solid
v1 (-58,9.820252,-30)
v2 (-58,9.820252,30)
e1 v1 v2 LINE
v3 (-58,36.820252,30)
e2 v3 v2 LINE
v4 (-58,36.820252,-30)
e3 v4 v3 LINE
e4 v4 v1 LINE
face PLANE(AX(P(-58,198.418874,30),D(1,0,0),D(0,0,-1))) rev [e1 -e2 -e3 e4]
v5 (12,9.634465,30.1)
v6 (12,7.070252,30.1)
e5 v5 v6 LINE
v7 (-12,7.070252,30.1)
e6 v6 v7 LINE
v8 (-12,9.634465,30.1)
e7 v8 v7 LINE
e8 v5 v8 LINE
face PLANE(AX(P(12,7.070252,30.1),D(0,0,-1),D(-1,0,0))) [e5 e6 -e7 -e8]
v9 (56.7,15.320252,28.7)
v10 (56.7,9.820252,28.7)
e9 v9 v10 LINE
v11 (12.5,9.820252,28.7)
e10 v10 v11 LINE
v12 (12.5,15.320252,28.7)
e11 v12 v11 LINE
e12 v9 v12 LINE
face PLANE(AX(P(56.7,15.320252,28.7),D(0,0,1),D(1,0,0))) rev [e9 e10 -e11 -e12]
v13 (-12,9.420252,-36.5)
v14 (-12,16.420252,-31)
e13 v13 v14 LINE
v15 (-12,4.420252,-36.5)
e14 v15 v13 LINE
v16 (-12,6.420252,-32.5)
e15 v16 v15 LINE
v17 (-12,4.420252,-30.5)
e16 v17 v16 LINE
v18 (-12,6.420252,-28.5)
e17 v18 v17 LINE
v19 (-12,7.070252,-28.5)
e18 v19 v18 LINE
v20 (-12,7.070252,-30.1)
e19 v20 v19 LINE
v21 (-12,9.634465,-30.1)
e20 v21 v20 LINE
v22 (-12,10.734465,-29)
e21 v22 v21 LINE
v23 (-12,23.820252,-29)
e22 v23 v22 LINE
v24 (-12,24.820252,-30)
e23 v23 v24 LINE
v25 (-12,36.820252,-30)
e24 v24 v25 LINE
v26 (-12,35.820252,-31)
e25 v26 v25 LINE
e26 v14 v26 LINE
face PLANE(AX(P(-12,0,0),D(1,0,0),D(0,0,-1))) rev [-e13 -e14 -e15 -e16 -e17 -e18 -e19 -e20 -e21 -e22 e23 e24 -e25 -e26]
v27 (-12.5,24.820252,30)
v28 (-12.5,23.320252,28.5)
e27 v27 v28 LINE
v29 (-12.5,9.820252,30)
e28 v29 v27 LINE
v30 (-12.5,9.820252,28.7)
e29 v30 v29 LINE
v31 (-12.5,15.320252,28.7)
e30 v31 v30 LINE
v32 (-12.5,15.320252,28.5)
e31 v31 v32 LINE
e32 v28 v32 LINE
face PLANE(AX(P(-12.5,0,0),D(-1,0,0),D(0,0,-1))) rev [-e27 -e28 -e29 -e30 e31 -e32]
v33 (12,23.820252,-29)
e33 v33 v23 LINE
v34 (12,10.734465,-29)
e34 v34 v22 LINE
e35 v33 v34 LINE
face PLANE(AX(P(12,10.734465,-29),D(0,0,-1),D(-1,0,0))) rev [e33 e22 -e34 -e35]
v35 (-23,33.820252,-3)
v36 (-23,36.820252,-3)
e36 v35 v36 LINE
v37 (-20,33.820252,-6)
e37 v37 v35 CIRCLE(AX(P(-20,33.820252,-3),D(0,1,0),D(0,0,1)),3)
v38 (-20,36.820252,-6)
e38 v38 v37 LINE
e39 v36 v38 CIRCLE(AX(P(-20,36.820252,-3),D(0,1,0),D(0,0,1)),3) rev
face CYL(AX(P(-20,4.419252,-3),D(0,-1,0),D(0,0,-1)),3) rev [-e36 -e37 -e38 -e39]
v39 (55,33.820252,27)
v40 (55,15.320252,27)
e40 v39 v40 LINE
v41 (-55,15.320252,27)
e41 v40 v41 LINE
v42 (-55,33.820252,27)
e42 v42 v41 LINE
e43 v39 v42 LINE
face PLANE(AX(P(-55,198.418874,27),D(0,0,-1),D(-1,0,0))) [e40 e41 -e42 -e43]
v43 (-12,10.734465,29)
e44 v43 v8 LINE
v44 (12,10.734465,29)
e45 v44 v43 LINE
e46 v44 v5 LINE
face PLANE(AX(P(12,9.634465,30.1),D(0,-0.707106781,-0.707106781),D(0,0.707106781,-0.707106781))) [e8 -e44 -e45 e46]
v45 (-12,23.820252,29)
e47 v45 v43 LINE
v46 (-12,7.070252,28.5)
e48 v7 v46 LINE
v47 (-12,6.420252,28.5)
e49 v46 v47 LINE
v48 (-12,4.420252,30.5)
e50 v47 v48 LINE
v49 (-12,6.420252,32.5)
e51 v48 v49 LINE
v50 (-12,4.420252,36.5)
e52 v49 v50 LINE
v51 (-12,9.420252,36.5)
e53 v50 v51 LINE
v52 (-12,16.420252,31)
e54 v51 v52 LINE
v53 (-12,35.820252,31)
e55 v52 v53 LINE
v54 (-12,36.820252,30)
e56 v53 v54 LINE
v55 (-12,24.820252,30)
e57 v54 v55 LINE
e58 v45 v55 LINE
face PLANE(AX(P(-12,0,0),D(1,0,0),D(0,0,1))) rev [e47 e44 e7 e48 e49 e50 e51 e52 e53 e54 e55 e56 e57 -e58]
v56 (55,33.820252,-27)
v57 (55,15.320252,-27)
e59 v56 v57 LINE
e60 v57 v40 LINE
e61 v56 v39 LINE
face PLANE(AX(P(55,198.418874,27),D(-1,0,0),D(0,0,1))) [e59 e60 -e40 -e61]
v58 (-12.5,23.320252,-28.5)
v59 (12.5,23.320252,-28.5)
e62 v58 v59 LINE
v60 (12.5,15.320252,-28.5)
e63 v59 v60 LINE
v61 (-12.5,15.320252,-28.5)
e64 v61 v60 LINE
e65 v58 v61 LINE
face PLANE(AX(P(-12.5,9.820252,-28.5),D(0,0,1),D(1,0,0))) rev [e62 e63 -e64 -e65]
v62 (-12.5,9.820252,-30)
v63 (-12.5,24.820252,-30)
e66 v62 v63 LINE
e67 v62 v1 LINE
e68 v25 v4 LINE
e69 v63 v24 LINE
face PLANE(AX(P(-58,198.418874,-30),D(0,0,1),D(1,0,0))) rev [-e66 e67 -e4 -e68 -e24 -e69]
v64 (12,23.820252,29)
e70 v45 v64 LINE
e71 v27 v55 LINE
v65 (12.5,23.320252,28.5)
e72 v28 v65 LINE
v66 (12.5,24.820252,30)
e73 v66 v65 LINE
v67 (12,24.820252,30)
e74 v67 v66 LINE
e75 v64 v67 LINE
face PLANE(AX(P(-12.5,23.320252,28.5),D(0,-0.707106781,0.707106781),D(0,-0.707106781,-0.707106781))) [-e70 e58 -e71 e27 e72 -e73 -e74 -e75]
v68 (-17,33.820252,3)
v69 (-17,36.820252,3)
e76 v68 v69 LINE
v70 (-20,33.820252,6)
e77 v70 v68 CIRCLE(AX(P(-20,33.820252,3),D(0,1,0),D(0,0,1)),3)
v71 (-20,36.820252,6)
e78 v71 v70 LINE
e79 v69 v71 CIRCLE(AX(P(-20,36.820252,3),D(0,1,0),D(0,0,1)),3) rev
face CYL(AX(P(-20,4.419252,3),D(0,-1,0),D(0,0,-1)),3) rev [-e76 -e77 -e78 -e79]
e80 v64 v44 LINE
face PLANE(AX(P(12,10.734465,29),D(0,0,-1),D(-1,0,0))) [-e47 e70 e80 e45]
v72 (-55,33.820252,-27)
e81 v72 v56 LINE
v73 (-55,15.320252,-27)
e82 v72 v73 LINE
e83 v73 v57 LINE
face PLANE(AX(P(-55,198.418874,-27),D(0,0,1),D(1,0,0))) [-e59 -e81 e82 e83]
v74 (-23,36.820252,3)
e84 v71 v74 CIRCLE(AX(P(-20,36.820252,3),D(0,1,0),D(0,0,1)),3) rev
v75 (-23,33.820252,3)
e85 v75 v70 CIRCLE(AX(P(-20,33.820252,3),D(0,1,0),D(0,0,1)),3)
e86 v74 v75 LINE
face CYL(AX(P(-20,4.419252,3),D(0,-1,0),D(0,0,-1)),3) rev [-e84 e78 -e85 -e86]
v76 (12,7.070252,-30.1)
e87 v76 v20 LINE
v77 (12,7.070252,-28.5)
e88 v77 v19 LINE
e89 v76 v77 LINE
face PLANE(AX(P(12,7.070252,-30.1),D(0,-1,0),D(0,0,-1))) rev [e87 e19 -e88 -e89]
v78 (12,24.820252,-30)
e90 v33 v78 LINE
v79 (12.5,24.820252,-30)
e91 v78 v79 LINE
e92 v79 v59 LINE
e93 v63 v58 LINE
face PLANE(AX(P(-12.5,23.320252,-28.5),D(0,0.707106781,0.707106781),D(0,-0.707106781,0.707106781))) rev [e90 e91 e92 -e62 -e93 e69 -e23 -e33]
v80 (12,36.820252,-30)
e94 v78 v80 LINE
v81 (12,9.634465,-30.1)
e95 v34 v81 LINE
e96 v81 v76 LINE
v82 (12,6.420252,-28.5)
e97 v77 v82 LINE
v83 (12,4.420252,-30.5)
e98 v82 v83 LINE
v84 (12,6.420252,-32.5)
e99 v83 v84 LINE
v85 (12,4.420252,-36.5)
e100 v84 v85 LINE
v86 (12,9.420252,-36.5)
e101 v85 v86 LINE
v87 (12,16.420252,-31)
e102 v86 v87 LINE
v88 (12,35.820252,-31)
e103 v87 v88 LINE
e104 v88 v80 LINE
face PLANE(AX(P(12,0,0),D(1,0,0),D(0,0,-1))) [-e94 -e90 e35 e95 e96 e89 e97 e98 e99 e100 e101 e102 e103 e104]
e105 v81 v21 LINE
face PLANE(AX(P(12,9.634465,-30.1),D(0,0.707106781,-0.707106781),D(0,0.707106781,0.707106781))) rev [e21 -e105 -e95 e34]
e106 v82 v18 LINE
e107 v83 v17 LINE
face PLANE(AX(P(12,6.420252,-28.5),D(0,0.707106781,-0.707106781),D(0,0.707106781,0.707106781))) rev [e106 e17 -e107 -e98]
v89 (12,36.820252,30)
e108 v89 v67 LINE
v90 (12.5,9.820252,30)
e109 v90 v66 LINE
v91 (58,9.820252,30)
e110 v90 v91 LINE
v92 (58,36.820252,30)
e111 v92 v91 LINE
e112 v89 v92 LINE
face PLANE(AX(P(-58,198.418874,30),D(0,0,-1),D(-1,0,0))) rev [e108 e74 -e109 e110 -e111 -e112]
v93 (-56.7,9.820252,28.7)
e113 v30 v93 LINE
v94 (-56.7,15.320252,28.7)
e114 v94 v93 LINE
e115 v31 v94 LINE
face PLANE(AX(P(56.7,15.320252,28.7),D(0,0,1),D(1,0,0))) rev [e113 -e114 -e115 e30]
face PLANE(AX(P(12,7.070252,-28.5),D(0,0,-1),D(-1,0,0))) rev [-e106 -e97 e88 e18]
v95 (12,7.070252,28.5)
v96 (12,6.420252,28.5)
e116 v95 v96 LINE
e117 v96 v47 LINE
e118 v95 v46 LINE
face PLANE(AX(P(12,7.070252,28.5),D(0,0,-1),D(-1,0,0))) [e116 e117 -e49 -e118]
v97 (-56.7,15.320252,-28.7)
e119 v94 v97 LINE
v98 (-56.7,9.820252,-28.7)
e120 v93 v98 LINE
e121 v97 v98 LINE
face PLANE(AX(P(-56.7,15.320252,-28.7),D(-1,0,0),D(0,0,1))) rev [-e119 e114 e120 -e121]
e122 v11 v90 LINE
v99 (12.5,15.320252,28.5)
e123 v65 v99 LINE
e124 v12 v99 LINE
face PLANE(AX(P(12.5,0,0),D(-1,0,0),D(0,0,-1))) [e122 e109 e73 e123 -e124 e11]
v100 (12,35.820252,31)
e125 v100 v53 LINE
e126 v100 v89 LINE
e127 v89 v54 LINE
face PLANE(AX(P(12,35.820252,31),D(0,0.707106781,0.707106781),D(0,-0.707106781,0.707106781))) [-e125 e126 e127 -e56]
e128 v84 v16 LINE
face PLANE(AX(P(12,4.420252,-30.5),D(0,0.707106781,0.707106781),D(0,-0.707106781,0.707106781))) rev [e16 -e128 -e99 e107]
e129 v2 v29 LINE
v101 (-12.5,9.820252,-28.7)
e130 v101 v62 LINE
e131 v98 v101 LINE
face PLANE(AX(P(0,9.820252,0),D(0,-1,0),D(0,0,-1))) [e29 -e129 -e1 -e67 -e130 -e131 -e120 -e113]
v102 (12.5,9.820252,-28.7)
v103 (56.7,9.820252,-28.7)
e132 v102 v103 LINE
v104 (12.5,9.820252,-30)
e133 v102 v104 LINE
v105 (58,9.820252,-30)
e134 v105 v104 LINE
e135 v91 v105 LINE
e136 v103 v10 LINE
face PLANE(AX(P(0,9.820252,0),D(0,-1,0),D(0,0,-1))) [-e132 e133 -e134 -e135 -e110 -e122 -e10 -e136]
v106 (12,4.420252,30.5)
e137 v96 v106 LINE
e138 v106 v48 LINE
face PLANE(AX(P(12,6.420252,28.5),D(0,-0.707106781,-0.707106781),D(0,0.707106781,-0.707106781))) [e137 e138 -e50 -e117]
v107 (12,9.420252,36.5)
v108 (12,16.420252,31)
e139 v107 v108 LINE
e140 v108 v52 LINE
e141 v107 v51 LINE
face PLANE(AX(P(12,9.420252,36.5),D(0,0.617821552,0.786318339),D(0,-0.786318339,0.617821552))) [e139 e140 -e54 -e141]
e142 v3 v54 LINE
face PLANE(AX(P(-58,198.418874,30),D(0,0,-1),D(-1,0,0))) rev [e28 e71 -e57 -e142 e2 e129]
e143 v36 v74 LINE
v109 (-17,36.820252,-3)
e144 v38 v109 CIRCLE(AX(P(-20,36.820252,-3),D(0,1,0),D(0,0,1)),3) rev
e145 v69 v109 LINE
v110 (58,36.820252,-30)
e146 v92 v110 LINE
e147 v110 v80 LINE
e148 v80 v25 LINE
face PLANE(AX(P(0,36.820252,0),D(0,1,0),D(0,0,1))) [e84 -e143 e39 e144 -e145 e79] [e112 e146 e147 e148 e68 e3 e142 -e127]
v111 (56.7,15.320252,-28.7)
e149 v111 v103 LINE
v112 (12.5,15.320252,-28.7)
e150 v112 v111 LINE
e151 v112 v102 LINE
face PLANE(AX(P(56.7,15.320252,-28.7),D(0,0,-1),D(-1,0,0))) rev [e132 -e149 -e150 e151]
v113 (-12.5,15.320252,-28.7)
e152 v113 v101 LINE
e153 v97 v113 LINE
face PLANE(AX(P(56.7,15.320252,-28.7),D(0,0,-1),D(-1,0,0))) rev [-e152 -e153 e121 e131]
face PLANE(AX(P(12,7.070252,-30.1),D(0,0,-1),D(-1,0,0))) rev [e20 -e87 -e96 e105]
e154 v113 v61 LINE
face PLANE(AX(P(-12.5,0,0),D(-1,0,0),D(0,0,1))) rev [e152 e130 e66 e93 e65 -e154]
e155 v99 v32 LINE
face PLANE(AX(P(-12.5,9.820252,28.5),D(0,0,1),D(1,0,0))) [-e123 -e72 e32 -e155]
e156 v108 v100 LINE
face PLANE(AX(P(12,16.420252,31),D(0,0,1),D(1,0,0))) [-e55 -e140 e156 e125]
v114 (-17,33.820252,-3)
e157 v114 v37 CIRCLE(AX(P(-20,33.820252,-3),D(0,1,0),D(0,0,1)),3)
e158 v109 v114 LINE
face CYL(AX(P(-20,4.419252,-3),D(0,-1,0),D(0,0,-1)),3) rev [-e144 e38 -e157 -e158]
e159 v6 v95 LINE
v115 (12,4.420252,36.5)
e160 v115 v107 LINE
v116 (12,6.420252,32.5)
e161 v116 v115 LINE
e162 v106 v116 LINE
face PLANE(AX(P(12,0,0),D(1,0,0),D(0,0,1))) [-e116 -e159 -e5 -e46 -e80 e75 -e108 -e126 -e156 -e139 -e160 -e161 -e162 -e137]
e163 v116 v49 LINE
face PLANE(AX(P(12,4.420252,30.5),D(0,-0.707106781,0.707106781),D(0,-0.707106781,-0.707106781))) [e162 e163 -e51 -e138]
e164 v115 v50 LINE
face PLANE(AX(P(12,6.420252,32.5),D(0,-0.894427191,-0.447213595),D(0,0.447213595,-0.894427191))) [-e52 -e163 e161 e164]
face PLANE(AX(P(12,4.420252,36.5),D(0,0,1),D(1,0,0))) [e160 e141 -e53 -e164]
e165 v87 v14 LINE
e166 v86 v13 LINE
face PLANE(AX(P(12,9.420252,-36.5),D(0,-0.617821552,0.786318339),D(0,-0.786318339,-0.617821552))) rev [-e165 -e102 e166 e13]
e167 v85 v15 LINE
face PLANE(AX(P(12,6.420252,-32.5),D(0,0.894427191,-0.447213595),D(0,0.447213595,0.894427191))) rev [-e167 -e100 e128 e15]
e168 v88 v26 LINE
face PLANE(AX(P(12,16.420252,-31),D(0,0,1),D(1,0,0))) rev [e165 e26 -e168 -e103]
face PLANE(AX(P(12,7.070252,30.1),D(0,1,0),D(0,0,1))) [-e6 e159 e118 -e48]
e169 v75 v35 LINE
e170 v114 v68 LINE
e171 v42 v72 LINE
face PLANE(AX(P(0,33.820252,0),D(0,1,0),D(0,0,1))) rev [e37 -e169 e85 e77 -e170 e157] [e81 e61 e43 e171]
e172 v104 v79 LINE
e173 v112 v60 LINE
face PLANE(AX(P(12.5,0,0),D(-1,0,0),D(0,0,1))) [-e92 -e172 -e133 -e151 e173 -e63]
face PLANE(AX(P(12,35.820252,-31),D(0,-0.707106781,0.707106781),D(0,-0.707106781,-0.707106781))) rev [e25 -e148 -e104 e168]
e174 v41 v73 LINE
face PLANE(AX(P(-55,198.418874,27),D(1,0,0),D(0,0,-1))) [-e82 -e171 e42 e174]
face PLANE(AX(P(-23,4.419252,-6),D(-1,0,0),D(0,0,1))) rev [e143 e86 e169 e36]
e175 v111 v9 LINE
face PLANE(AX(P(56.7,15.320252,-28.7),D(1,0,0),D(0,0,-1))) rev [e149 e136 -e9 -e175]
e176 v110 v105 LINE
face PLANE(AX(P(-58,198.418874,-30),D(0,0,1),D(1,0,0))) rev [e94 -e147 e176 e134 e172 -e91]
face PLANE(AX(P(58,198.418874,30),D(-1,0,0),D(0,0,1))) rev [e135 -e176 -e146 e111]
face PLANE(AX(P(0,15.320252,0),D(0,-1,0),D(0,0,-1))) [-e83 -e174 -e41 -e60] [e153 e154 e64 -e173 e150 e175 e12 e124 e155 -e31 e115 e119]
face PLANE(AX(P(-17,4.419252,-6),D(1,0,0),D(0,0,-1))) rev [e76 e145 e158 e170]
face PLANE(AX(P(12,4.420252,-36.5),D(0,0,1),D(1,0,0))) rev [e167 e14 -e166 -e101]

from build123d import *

# Parameters (mm, degrees)
SKETCH1_W           = 116
SKETCH1_H           = 60
SKETCH1_W_2         = 110
SKETCH1_H_2         = 54
BOSS_EXTRUDE1_DEPTH = 24
SKETCH2_W           = 116
SKETCH2_H           = 60
BOSS_EXTRUDE2_DEPTH = 3
CUT_EXTRUDE1_DEPTH  = 12.5
BOSS_EXTRUDE3_DEPTH = 12
SKETCH5_W           = 113.4
SKETCH5_H           = 57.4
SKETCH5_W_2         = 110
SKETCH5_H_2         = 54
CUT_EXTRUDE2_DEPTH  = 5.5
CUT_EXTRUDE3_REACH  = 77.802
SKETCH6_W           = 6
SKETCH6_H           = 12
FILLET3_R           = 3


with BuildPart() as part:
    # Sketch1 → Boss-Extrude1 (new body)
    with BuildSketch(Plane(origin=(0, 9.820251789, 0), x_dir=(1, 0, 0), z_dir=(0, 1, 0))):
        Rectangle(SKETCH1_W, SKETCH1_H)
        Rectangle(SKETCH1_W_2, SKETCH1_H_2, mode=Mode.SUBTRACT)
    extrude(amount=BOSS_EXTRUDE1_DEPTH)

    # Sketch2 → Boss-Extrude2 (add)
    with BuildSketch(Plane(origin=(0, 33.820251789, 0), x_dir=(1, 0, 0), z_dir=(0, 1, 0))):
        Rectangle(SKETCH2_W, SKETCH2_H)
    extrude(amount=BOSS_EXTRUDE2_DEPTH)

    # Sketch3 → Cut-Extrude1 (cut, symmetric)
    with BuildSketch(Plane(origin=(0, 0, 0), x_dir=(0, 0, -1), z_dir=(1, 0, 0))):
        Polygon((28.5, 9.820251789), (28.5, 23.320251789), (30, 24.820251789), (30, 9.820251789), align=None)
    cut_extrude1 = extrude(amount=CUT_EXTRUDE1_DEPTH, both=True, mode=Mode.SUBTRACT)

    # Sketch4 → Boss-Extrude3 (add, symmetric)
    with BuildSketch(Plane(origin=(0, 0, 0), x_dir=(0, 0, -1), z_dir=(1, 0, 0))):
        Polygon((30.1, 7.070251789), (28.5, 7.070251789), (28.5, 6.420251789), (30.5, 4.420251789), (32.5, 6.420251789), (36.5, 4.420251789), (36.5, 9.420251789), (31, 16.420251789), (31, 35.820251789), (30, 36.820251789), (29, 36.820251789), (29, 10.734465351), (30.1, 9.634465351), align=None)
    boss_extrude3 = extrude(amount=BOSS_EXTRUDE3_DEPTH, both=True)

    # Sketch5 → Cut-Extrude2 (cut)
    with BuildSketch(Plane.XZ.offset(-9.820251789)):
        Rectangle(SKETCH5_W, SKETCH5_H)
        Rectangle(SKETCH5_W_2, SKETCH5_H_2, mode=Mode.SUBTRACT)
    extrude(amount=-CUT_EXTRUDE2_DEPTH, mode=Mode.SUBTRACT)

    # Mirror1: Cut-Extrude1, Boss-Extrude3 across plane
    add(cut_extrude1.mirror(Plane.XY), mode=Mode.SUBTRACT)
    add(boss_extrude3.mirror(Plane.XY))

    # Sketch6 → Cut-Extrude3 (cut, up to next)
    with BuildSketch(Plane(origin=(0, 36.820251789, 0), x_dir=(1, 0, 0), z_dir=(0, 1, 0)), mode=Mode.PRIVATE) as cut_extrude3_sk1:
        with Locations((-20, 0)):
            Rectangle(SKETCH6_W, SKETCH6_H)
    cut_extrude3_tool1 = extrude(cut_extrude3_sk1.sketch, amount=-CUT_EXTRUDE3_REACH, mode=Mode.PRIVATE) & part.part
    add(cut_extrude3_tool1.solids().sort_by_distance((-20, 36.820252, 0))[0], mode=Mode.SUBTRACT)

    # Fillet3
    fillet3_edges = [part.edges().sort_by_distance(p)[0] for p in [
        (-23, 35.320251789, 6),
        (-17, 35.320251789, 6),
        (-17, 35.320251789, -6),
        (-23, 35.320251789, -6),
    ]]
    fillet(fillet3_edges, radius=FILLET3_R - 0.0001)  # a hair under: the kernel refuses the full size


solid = part.part
